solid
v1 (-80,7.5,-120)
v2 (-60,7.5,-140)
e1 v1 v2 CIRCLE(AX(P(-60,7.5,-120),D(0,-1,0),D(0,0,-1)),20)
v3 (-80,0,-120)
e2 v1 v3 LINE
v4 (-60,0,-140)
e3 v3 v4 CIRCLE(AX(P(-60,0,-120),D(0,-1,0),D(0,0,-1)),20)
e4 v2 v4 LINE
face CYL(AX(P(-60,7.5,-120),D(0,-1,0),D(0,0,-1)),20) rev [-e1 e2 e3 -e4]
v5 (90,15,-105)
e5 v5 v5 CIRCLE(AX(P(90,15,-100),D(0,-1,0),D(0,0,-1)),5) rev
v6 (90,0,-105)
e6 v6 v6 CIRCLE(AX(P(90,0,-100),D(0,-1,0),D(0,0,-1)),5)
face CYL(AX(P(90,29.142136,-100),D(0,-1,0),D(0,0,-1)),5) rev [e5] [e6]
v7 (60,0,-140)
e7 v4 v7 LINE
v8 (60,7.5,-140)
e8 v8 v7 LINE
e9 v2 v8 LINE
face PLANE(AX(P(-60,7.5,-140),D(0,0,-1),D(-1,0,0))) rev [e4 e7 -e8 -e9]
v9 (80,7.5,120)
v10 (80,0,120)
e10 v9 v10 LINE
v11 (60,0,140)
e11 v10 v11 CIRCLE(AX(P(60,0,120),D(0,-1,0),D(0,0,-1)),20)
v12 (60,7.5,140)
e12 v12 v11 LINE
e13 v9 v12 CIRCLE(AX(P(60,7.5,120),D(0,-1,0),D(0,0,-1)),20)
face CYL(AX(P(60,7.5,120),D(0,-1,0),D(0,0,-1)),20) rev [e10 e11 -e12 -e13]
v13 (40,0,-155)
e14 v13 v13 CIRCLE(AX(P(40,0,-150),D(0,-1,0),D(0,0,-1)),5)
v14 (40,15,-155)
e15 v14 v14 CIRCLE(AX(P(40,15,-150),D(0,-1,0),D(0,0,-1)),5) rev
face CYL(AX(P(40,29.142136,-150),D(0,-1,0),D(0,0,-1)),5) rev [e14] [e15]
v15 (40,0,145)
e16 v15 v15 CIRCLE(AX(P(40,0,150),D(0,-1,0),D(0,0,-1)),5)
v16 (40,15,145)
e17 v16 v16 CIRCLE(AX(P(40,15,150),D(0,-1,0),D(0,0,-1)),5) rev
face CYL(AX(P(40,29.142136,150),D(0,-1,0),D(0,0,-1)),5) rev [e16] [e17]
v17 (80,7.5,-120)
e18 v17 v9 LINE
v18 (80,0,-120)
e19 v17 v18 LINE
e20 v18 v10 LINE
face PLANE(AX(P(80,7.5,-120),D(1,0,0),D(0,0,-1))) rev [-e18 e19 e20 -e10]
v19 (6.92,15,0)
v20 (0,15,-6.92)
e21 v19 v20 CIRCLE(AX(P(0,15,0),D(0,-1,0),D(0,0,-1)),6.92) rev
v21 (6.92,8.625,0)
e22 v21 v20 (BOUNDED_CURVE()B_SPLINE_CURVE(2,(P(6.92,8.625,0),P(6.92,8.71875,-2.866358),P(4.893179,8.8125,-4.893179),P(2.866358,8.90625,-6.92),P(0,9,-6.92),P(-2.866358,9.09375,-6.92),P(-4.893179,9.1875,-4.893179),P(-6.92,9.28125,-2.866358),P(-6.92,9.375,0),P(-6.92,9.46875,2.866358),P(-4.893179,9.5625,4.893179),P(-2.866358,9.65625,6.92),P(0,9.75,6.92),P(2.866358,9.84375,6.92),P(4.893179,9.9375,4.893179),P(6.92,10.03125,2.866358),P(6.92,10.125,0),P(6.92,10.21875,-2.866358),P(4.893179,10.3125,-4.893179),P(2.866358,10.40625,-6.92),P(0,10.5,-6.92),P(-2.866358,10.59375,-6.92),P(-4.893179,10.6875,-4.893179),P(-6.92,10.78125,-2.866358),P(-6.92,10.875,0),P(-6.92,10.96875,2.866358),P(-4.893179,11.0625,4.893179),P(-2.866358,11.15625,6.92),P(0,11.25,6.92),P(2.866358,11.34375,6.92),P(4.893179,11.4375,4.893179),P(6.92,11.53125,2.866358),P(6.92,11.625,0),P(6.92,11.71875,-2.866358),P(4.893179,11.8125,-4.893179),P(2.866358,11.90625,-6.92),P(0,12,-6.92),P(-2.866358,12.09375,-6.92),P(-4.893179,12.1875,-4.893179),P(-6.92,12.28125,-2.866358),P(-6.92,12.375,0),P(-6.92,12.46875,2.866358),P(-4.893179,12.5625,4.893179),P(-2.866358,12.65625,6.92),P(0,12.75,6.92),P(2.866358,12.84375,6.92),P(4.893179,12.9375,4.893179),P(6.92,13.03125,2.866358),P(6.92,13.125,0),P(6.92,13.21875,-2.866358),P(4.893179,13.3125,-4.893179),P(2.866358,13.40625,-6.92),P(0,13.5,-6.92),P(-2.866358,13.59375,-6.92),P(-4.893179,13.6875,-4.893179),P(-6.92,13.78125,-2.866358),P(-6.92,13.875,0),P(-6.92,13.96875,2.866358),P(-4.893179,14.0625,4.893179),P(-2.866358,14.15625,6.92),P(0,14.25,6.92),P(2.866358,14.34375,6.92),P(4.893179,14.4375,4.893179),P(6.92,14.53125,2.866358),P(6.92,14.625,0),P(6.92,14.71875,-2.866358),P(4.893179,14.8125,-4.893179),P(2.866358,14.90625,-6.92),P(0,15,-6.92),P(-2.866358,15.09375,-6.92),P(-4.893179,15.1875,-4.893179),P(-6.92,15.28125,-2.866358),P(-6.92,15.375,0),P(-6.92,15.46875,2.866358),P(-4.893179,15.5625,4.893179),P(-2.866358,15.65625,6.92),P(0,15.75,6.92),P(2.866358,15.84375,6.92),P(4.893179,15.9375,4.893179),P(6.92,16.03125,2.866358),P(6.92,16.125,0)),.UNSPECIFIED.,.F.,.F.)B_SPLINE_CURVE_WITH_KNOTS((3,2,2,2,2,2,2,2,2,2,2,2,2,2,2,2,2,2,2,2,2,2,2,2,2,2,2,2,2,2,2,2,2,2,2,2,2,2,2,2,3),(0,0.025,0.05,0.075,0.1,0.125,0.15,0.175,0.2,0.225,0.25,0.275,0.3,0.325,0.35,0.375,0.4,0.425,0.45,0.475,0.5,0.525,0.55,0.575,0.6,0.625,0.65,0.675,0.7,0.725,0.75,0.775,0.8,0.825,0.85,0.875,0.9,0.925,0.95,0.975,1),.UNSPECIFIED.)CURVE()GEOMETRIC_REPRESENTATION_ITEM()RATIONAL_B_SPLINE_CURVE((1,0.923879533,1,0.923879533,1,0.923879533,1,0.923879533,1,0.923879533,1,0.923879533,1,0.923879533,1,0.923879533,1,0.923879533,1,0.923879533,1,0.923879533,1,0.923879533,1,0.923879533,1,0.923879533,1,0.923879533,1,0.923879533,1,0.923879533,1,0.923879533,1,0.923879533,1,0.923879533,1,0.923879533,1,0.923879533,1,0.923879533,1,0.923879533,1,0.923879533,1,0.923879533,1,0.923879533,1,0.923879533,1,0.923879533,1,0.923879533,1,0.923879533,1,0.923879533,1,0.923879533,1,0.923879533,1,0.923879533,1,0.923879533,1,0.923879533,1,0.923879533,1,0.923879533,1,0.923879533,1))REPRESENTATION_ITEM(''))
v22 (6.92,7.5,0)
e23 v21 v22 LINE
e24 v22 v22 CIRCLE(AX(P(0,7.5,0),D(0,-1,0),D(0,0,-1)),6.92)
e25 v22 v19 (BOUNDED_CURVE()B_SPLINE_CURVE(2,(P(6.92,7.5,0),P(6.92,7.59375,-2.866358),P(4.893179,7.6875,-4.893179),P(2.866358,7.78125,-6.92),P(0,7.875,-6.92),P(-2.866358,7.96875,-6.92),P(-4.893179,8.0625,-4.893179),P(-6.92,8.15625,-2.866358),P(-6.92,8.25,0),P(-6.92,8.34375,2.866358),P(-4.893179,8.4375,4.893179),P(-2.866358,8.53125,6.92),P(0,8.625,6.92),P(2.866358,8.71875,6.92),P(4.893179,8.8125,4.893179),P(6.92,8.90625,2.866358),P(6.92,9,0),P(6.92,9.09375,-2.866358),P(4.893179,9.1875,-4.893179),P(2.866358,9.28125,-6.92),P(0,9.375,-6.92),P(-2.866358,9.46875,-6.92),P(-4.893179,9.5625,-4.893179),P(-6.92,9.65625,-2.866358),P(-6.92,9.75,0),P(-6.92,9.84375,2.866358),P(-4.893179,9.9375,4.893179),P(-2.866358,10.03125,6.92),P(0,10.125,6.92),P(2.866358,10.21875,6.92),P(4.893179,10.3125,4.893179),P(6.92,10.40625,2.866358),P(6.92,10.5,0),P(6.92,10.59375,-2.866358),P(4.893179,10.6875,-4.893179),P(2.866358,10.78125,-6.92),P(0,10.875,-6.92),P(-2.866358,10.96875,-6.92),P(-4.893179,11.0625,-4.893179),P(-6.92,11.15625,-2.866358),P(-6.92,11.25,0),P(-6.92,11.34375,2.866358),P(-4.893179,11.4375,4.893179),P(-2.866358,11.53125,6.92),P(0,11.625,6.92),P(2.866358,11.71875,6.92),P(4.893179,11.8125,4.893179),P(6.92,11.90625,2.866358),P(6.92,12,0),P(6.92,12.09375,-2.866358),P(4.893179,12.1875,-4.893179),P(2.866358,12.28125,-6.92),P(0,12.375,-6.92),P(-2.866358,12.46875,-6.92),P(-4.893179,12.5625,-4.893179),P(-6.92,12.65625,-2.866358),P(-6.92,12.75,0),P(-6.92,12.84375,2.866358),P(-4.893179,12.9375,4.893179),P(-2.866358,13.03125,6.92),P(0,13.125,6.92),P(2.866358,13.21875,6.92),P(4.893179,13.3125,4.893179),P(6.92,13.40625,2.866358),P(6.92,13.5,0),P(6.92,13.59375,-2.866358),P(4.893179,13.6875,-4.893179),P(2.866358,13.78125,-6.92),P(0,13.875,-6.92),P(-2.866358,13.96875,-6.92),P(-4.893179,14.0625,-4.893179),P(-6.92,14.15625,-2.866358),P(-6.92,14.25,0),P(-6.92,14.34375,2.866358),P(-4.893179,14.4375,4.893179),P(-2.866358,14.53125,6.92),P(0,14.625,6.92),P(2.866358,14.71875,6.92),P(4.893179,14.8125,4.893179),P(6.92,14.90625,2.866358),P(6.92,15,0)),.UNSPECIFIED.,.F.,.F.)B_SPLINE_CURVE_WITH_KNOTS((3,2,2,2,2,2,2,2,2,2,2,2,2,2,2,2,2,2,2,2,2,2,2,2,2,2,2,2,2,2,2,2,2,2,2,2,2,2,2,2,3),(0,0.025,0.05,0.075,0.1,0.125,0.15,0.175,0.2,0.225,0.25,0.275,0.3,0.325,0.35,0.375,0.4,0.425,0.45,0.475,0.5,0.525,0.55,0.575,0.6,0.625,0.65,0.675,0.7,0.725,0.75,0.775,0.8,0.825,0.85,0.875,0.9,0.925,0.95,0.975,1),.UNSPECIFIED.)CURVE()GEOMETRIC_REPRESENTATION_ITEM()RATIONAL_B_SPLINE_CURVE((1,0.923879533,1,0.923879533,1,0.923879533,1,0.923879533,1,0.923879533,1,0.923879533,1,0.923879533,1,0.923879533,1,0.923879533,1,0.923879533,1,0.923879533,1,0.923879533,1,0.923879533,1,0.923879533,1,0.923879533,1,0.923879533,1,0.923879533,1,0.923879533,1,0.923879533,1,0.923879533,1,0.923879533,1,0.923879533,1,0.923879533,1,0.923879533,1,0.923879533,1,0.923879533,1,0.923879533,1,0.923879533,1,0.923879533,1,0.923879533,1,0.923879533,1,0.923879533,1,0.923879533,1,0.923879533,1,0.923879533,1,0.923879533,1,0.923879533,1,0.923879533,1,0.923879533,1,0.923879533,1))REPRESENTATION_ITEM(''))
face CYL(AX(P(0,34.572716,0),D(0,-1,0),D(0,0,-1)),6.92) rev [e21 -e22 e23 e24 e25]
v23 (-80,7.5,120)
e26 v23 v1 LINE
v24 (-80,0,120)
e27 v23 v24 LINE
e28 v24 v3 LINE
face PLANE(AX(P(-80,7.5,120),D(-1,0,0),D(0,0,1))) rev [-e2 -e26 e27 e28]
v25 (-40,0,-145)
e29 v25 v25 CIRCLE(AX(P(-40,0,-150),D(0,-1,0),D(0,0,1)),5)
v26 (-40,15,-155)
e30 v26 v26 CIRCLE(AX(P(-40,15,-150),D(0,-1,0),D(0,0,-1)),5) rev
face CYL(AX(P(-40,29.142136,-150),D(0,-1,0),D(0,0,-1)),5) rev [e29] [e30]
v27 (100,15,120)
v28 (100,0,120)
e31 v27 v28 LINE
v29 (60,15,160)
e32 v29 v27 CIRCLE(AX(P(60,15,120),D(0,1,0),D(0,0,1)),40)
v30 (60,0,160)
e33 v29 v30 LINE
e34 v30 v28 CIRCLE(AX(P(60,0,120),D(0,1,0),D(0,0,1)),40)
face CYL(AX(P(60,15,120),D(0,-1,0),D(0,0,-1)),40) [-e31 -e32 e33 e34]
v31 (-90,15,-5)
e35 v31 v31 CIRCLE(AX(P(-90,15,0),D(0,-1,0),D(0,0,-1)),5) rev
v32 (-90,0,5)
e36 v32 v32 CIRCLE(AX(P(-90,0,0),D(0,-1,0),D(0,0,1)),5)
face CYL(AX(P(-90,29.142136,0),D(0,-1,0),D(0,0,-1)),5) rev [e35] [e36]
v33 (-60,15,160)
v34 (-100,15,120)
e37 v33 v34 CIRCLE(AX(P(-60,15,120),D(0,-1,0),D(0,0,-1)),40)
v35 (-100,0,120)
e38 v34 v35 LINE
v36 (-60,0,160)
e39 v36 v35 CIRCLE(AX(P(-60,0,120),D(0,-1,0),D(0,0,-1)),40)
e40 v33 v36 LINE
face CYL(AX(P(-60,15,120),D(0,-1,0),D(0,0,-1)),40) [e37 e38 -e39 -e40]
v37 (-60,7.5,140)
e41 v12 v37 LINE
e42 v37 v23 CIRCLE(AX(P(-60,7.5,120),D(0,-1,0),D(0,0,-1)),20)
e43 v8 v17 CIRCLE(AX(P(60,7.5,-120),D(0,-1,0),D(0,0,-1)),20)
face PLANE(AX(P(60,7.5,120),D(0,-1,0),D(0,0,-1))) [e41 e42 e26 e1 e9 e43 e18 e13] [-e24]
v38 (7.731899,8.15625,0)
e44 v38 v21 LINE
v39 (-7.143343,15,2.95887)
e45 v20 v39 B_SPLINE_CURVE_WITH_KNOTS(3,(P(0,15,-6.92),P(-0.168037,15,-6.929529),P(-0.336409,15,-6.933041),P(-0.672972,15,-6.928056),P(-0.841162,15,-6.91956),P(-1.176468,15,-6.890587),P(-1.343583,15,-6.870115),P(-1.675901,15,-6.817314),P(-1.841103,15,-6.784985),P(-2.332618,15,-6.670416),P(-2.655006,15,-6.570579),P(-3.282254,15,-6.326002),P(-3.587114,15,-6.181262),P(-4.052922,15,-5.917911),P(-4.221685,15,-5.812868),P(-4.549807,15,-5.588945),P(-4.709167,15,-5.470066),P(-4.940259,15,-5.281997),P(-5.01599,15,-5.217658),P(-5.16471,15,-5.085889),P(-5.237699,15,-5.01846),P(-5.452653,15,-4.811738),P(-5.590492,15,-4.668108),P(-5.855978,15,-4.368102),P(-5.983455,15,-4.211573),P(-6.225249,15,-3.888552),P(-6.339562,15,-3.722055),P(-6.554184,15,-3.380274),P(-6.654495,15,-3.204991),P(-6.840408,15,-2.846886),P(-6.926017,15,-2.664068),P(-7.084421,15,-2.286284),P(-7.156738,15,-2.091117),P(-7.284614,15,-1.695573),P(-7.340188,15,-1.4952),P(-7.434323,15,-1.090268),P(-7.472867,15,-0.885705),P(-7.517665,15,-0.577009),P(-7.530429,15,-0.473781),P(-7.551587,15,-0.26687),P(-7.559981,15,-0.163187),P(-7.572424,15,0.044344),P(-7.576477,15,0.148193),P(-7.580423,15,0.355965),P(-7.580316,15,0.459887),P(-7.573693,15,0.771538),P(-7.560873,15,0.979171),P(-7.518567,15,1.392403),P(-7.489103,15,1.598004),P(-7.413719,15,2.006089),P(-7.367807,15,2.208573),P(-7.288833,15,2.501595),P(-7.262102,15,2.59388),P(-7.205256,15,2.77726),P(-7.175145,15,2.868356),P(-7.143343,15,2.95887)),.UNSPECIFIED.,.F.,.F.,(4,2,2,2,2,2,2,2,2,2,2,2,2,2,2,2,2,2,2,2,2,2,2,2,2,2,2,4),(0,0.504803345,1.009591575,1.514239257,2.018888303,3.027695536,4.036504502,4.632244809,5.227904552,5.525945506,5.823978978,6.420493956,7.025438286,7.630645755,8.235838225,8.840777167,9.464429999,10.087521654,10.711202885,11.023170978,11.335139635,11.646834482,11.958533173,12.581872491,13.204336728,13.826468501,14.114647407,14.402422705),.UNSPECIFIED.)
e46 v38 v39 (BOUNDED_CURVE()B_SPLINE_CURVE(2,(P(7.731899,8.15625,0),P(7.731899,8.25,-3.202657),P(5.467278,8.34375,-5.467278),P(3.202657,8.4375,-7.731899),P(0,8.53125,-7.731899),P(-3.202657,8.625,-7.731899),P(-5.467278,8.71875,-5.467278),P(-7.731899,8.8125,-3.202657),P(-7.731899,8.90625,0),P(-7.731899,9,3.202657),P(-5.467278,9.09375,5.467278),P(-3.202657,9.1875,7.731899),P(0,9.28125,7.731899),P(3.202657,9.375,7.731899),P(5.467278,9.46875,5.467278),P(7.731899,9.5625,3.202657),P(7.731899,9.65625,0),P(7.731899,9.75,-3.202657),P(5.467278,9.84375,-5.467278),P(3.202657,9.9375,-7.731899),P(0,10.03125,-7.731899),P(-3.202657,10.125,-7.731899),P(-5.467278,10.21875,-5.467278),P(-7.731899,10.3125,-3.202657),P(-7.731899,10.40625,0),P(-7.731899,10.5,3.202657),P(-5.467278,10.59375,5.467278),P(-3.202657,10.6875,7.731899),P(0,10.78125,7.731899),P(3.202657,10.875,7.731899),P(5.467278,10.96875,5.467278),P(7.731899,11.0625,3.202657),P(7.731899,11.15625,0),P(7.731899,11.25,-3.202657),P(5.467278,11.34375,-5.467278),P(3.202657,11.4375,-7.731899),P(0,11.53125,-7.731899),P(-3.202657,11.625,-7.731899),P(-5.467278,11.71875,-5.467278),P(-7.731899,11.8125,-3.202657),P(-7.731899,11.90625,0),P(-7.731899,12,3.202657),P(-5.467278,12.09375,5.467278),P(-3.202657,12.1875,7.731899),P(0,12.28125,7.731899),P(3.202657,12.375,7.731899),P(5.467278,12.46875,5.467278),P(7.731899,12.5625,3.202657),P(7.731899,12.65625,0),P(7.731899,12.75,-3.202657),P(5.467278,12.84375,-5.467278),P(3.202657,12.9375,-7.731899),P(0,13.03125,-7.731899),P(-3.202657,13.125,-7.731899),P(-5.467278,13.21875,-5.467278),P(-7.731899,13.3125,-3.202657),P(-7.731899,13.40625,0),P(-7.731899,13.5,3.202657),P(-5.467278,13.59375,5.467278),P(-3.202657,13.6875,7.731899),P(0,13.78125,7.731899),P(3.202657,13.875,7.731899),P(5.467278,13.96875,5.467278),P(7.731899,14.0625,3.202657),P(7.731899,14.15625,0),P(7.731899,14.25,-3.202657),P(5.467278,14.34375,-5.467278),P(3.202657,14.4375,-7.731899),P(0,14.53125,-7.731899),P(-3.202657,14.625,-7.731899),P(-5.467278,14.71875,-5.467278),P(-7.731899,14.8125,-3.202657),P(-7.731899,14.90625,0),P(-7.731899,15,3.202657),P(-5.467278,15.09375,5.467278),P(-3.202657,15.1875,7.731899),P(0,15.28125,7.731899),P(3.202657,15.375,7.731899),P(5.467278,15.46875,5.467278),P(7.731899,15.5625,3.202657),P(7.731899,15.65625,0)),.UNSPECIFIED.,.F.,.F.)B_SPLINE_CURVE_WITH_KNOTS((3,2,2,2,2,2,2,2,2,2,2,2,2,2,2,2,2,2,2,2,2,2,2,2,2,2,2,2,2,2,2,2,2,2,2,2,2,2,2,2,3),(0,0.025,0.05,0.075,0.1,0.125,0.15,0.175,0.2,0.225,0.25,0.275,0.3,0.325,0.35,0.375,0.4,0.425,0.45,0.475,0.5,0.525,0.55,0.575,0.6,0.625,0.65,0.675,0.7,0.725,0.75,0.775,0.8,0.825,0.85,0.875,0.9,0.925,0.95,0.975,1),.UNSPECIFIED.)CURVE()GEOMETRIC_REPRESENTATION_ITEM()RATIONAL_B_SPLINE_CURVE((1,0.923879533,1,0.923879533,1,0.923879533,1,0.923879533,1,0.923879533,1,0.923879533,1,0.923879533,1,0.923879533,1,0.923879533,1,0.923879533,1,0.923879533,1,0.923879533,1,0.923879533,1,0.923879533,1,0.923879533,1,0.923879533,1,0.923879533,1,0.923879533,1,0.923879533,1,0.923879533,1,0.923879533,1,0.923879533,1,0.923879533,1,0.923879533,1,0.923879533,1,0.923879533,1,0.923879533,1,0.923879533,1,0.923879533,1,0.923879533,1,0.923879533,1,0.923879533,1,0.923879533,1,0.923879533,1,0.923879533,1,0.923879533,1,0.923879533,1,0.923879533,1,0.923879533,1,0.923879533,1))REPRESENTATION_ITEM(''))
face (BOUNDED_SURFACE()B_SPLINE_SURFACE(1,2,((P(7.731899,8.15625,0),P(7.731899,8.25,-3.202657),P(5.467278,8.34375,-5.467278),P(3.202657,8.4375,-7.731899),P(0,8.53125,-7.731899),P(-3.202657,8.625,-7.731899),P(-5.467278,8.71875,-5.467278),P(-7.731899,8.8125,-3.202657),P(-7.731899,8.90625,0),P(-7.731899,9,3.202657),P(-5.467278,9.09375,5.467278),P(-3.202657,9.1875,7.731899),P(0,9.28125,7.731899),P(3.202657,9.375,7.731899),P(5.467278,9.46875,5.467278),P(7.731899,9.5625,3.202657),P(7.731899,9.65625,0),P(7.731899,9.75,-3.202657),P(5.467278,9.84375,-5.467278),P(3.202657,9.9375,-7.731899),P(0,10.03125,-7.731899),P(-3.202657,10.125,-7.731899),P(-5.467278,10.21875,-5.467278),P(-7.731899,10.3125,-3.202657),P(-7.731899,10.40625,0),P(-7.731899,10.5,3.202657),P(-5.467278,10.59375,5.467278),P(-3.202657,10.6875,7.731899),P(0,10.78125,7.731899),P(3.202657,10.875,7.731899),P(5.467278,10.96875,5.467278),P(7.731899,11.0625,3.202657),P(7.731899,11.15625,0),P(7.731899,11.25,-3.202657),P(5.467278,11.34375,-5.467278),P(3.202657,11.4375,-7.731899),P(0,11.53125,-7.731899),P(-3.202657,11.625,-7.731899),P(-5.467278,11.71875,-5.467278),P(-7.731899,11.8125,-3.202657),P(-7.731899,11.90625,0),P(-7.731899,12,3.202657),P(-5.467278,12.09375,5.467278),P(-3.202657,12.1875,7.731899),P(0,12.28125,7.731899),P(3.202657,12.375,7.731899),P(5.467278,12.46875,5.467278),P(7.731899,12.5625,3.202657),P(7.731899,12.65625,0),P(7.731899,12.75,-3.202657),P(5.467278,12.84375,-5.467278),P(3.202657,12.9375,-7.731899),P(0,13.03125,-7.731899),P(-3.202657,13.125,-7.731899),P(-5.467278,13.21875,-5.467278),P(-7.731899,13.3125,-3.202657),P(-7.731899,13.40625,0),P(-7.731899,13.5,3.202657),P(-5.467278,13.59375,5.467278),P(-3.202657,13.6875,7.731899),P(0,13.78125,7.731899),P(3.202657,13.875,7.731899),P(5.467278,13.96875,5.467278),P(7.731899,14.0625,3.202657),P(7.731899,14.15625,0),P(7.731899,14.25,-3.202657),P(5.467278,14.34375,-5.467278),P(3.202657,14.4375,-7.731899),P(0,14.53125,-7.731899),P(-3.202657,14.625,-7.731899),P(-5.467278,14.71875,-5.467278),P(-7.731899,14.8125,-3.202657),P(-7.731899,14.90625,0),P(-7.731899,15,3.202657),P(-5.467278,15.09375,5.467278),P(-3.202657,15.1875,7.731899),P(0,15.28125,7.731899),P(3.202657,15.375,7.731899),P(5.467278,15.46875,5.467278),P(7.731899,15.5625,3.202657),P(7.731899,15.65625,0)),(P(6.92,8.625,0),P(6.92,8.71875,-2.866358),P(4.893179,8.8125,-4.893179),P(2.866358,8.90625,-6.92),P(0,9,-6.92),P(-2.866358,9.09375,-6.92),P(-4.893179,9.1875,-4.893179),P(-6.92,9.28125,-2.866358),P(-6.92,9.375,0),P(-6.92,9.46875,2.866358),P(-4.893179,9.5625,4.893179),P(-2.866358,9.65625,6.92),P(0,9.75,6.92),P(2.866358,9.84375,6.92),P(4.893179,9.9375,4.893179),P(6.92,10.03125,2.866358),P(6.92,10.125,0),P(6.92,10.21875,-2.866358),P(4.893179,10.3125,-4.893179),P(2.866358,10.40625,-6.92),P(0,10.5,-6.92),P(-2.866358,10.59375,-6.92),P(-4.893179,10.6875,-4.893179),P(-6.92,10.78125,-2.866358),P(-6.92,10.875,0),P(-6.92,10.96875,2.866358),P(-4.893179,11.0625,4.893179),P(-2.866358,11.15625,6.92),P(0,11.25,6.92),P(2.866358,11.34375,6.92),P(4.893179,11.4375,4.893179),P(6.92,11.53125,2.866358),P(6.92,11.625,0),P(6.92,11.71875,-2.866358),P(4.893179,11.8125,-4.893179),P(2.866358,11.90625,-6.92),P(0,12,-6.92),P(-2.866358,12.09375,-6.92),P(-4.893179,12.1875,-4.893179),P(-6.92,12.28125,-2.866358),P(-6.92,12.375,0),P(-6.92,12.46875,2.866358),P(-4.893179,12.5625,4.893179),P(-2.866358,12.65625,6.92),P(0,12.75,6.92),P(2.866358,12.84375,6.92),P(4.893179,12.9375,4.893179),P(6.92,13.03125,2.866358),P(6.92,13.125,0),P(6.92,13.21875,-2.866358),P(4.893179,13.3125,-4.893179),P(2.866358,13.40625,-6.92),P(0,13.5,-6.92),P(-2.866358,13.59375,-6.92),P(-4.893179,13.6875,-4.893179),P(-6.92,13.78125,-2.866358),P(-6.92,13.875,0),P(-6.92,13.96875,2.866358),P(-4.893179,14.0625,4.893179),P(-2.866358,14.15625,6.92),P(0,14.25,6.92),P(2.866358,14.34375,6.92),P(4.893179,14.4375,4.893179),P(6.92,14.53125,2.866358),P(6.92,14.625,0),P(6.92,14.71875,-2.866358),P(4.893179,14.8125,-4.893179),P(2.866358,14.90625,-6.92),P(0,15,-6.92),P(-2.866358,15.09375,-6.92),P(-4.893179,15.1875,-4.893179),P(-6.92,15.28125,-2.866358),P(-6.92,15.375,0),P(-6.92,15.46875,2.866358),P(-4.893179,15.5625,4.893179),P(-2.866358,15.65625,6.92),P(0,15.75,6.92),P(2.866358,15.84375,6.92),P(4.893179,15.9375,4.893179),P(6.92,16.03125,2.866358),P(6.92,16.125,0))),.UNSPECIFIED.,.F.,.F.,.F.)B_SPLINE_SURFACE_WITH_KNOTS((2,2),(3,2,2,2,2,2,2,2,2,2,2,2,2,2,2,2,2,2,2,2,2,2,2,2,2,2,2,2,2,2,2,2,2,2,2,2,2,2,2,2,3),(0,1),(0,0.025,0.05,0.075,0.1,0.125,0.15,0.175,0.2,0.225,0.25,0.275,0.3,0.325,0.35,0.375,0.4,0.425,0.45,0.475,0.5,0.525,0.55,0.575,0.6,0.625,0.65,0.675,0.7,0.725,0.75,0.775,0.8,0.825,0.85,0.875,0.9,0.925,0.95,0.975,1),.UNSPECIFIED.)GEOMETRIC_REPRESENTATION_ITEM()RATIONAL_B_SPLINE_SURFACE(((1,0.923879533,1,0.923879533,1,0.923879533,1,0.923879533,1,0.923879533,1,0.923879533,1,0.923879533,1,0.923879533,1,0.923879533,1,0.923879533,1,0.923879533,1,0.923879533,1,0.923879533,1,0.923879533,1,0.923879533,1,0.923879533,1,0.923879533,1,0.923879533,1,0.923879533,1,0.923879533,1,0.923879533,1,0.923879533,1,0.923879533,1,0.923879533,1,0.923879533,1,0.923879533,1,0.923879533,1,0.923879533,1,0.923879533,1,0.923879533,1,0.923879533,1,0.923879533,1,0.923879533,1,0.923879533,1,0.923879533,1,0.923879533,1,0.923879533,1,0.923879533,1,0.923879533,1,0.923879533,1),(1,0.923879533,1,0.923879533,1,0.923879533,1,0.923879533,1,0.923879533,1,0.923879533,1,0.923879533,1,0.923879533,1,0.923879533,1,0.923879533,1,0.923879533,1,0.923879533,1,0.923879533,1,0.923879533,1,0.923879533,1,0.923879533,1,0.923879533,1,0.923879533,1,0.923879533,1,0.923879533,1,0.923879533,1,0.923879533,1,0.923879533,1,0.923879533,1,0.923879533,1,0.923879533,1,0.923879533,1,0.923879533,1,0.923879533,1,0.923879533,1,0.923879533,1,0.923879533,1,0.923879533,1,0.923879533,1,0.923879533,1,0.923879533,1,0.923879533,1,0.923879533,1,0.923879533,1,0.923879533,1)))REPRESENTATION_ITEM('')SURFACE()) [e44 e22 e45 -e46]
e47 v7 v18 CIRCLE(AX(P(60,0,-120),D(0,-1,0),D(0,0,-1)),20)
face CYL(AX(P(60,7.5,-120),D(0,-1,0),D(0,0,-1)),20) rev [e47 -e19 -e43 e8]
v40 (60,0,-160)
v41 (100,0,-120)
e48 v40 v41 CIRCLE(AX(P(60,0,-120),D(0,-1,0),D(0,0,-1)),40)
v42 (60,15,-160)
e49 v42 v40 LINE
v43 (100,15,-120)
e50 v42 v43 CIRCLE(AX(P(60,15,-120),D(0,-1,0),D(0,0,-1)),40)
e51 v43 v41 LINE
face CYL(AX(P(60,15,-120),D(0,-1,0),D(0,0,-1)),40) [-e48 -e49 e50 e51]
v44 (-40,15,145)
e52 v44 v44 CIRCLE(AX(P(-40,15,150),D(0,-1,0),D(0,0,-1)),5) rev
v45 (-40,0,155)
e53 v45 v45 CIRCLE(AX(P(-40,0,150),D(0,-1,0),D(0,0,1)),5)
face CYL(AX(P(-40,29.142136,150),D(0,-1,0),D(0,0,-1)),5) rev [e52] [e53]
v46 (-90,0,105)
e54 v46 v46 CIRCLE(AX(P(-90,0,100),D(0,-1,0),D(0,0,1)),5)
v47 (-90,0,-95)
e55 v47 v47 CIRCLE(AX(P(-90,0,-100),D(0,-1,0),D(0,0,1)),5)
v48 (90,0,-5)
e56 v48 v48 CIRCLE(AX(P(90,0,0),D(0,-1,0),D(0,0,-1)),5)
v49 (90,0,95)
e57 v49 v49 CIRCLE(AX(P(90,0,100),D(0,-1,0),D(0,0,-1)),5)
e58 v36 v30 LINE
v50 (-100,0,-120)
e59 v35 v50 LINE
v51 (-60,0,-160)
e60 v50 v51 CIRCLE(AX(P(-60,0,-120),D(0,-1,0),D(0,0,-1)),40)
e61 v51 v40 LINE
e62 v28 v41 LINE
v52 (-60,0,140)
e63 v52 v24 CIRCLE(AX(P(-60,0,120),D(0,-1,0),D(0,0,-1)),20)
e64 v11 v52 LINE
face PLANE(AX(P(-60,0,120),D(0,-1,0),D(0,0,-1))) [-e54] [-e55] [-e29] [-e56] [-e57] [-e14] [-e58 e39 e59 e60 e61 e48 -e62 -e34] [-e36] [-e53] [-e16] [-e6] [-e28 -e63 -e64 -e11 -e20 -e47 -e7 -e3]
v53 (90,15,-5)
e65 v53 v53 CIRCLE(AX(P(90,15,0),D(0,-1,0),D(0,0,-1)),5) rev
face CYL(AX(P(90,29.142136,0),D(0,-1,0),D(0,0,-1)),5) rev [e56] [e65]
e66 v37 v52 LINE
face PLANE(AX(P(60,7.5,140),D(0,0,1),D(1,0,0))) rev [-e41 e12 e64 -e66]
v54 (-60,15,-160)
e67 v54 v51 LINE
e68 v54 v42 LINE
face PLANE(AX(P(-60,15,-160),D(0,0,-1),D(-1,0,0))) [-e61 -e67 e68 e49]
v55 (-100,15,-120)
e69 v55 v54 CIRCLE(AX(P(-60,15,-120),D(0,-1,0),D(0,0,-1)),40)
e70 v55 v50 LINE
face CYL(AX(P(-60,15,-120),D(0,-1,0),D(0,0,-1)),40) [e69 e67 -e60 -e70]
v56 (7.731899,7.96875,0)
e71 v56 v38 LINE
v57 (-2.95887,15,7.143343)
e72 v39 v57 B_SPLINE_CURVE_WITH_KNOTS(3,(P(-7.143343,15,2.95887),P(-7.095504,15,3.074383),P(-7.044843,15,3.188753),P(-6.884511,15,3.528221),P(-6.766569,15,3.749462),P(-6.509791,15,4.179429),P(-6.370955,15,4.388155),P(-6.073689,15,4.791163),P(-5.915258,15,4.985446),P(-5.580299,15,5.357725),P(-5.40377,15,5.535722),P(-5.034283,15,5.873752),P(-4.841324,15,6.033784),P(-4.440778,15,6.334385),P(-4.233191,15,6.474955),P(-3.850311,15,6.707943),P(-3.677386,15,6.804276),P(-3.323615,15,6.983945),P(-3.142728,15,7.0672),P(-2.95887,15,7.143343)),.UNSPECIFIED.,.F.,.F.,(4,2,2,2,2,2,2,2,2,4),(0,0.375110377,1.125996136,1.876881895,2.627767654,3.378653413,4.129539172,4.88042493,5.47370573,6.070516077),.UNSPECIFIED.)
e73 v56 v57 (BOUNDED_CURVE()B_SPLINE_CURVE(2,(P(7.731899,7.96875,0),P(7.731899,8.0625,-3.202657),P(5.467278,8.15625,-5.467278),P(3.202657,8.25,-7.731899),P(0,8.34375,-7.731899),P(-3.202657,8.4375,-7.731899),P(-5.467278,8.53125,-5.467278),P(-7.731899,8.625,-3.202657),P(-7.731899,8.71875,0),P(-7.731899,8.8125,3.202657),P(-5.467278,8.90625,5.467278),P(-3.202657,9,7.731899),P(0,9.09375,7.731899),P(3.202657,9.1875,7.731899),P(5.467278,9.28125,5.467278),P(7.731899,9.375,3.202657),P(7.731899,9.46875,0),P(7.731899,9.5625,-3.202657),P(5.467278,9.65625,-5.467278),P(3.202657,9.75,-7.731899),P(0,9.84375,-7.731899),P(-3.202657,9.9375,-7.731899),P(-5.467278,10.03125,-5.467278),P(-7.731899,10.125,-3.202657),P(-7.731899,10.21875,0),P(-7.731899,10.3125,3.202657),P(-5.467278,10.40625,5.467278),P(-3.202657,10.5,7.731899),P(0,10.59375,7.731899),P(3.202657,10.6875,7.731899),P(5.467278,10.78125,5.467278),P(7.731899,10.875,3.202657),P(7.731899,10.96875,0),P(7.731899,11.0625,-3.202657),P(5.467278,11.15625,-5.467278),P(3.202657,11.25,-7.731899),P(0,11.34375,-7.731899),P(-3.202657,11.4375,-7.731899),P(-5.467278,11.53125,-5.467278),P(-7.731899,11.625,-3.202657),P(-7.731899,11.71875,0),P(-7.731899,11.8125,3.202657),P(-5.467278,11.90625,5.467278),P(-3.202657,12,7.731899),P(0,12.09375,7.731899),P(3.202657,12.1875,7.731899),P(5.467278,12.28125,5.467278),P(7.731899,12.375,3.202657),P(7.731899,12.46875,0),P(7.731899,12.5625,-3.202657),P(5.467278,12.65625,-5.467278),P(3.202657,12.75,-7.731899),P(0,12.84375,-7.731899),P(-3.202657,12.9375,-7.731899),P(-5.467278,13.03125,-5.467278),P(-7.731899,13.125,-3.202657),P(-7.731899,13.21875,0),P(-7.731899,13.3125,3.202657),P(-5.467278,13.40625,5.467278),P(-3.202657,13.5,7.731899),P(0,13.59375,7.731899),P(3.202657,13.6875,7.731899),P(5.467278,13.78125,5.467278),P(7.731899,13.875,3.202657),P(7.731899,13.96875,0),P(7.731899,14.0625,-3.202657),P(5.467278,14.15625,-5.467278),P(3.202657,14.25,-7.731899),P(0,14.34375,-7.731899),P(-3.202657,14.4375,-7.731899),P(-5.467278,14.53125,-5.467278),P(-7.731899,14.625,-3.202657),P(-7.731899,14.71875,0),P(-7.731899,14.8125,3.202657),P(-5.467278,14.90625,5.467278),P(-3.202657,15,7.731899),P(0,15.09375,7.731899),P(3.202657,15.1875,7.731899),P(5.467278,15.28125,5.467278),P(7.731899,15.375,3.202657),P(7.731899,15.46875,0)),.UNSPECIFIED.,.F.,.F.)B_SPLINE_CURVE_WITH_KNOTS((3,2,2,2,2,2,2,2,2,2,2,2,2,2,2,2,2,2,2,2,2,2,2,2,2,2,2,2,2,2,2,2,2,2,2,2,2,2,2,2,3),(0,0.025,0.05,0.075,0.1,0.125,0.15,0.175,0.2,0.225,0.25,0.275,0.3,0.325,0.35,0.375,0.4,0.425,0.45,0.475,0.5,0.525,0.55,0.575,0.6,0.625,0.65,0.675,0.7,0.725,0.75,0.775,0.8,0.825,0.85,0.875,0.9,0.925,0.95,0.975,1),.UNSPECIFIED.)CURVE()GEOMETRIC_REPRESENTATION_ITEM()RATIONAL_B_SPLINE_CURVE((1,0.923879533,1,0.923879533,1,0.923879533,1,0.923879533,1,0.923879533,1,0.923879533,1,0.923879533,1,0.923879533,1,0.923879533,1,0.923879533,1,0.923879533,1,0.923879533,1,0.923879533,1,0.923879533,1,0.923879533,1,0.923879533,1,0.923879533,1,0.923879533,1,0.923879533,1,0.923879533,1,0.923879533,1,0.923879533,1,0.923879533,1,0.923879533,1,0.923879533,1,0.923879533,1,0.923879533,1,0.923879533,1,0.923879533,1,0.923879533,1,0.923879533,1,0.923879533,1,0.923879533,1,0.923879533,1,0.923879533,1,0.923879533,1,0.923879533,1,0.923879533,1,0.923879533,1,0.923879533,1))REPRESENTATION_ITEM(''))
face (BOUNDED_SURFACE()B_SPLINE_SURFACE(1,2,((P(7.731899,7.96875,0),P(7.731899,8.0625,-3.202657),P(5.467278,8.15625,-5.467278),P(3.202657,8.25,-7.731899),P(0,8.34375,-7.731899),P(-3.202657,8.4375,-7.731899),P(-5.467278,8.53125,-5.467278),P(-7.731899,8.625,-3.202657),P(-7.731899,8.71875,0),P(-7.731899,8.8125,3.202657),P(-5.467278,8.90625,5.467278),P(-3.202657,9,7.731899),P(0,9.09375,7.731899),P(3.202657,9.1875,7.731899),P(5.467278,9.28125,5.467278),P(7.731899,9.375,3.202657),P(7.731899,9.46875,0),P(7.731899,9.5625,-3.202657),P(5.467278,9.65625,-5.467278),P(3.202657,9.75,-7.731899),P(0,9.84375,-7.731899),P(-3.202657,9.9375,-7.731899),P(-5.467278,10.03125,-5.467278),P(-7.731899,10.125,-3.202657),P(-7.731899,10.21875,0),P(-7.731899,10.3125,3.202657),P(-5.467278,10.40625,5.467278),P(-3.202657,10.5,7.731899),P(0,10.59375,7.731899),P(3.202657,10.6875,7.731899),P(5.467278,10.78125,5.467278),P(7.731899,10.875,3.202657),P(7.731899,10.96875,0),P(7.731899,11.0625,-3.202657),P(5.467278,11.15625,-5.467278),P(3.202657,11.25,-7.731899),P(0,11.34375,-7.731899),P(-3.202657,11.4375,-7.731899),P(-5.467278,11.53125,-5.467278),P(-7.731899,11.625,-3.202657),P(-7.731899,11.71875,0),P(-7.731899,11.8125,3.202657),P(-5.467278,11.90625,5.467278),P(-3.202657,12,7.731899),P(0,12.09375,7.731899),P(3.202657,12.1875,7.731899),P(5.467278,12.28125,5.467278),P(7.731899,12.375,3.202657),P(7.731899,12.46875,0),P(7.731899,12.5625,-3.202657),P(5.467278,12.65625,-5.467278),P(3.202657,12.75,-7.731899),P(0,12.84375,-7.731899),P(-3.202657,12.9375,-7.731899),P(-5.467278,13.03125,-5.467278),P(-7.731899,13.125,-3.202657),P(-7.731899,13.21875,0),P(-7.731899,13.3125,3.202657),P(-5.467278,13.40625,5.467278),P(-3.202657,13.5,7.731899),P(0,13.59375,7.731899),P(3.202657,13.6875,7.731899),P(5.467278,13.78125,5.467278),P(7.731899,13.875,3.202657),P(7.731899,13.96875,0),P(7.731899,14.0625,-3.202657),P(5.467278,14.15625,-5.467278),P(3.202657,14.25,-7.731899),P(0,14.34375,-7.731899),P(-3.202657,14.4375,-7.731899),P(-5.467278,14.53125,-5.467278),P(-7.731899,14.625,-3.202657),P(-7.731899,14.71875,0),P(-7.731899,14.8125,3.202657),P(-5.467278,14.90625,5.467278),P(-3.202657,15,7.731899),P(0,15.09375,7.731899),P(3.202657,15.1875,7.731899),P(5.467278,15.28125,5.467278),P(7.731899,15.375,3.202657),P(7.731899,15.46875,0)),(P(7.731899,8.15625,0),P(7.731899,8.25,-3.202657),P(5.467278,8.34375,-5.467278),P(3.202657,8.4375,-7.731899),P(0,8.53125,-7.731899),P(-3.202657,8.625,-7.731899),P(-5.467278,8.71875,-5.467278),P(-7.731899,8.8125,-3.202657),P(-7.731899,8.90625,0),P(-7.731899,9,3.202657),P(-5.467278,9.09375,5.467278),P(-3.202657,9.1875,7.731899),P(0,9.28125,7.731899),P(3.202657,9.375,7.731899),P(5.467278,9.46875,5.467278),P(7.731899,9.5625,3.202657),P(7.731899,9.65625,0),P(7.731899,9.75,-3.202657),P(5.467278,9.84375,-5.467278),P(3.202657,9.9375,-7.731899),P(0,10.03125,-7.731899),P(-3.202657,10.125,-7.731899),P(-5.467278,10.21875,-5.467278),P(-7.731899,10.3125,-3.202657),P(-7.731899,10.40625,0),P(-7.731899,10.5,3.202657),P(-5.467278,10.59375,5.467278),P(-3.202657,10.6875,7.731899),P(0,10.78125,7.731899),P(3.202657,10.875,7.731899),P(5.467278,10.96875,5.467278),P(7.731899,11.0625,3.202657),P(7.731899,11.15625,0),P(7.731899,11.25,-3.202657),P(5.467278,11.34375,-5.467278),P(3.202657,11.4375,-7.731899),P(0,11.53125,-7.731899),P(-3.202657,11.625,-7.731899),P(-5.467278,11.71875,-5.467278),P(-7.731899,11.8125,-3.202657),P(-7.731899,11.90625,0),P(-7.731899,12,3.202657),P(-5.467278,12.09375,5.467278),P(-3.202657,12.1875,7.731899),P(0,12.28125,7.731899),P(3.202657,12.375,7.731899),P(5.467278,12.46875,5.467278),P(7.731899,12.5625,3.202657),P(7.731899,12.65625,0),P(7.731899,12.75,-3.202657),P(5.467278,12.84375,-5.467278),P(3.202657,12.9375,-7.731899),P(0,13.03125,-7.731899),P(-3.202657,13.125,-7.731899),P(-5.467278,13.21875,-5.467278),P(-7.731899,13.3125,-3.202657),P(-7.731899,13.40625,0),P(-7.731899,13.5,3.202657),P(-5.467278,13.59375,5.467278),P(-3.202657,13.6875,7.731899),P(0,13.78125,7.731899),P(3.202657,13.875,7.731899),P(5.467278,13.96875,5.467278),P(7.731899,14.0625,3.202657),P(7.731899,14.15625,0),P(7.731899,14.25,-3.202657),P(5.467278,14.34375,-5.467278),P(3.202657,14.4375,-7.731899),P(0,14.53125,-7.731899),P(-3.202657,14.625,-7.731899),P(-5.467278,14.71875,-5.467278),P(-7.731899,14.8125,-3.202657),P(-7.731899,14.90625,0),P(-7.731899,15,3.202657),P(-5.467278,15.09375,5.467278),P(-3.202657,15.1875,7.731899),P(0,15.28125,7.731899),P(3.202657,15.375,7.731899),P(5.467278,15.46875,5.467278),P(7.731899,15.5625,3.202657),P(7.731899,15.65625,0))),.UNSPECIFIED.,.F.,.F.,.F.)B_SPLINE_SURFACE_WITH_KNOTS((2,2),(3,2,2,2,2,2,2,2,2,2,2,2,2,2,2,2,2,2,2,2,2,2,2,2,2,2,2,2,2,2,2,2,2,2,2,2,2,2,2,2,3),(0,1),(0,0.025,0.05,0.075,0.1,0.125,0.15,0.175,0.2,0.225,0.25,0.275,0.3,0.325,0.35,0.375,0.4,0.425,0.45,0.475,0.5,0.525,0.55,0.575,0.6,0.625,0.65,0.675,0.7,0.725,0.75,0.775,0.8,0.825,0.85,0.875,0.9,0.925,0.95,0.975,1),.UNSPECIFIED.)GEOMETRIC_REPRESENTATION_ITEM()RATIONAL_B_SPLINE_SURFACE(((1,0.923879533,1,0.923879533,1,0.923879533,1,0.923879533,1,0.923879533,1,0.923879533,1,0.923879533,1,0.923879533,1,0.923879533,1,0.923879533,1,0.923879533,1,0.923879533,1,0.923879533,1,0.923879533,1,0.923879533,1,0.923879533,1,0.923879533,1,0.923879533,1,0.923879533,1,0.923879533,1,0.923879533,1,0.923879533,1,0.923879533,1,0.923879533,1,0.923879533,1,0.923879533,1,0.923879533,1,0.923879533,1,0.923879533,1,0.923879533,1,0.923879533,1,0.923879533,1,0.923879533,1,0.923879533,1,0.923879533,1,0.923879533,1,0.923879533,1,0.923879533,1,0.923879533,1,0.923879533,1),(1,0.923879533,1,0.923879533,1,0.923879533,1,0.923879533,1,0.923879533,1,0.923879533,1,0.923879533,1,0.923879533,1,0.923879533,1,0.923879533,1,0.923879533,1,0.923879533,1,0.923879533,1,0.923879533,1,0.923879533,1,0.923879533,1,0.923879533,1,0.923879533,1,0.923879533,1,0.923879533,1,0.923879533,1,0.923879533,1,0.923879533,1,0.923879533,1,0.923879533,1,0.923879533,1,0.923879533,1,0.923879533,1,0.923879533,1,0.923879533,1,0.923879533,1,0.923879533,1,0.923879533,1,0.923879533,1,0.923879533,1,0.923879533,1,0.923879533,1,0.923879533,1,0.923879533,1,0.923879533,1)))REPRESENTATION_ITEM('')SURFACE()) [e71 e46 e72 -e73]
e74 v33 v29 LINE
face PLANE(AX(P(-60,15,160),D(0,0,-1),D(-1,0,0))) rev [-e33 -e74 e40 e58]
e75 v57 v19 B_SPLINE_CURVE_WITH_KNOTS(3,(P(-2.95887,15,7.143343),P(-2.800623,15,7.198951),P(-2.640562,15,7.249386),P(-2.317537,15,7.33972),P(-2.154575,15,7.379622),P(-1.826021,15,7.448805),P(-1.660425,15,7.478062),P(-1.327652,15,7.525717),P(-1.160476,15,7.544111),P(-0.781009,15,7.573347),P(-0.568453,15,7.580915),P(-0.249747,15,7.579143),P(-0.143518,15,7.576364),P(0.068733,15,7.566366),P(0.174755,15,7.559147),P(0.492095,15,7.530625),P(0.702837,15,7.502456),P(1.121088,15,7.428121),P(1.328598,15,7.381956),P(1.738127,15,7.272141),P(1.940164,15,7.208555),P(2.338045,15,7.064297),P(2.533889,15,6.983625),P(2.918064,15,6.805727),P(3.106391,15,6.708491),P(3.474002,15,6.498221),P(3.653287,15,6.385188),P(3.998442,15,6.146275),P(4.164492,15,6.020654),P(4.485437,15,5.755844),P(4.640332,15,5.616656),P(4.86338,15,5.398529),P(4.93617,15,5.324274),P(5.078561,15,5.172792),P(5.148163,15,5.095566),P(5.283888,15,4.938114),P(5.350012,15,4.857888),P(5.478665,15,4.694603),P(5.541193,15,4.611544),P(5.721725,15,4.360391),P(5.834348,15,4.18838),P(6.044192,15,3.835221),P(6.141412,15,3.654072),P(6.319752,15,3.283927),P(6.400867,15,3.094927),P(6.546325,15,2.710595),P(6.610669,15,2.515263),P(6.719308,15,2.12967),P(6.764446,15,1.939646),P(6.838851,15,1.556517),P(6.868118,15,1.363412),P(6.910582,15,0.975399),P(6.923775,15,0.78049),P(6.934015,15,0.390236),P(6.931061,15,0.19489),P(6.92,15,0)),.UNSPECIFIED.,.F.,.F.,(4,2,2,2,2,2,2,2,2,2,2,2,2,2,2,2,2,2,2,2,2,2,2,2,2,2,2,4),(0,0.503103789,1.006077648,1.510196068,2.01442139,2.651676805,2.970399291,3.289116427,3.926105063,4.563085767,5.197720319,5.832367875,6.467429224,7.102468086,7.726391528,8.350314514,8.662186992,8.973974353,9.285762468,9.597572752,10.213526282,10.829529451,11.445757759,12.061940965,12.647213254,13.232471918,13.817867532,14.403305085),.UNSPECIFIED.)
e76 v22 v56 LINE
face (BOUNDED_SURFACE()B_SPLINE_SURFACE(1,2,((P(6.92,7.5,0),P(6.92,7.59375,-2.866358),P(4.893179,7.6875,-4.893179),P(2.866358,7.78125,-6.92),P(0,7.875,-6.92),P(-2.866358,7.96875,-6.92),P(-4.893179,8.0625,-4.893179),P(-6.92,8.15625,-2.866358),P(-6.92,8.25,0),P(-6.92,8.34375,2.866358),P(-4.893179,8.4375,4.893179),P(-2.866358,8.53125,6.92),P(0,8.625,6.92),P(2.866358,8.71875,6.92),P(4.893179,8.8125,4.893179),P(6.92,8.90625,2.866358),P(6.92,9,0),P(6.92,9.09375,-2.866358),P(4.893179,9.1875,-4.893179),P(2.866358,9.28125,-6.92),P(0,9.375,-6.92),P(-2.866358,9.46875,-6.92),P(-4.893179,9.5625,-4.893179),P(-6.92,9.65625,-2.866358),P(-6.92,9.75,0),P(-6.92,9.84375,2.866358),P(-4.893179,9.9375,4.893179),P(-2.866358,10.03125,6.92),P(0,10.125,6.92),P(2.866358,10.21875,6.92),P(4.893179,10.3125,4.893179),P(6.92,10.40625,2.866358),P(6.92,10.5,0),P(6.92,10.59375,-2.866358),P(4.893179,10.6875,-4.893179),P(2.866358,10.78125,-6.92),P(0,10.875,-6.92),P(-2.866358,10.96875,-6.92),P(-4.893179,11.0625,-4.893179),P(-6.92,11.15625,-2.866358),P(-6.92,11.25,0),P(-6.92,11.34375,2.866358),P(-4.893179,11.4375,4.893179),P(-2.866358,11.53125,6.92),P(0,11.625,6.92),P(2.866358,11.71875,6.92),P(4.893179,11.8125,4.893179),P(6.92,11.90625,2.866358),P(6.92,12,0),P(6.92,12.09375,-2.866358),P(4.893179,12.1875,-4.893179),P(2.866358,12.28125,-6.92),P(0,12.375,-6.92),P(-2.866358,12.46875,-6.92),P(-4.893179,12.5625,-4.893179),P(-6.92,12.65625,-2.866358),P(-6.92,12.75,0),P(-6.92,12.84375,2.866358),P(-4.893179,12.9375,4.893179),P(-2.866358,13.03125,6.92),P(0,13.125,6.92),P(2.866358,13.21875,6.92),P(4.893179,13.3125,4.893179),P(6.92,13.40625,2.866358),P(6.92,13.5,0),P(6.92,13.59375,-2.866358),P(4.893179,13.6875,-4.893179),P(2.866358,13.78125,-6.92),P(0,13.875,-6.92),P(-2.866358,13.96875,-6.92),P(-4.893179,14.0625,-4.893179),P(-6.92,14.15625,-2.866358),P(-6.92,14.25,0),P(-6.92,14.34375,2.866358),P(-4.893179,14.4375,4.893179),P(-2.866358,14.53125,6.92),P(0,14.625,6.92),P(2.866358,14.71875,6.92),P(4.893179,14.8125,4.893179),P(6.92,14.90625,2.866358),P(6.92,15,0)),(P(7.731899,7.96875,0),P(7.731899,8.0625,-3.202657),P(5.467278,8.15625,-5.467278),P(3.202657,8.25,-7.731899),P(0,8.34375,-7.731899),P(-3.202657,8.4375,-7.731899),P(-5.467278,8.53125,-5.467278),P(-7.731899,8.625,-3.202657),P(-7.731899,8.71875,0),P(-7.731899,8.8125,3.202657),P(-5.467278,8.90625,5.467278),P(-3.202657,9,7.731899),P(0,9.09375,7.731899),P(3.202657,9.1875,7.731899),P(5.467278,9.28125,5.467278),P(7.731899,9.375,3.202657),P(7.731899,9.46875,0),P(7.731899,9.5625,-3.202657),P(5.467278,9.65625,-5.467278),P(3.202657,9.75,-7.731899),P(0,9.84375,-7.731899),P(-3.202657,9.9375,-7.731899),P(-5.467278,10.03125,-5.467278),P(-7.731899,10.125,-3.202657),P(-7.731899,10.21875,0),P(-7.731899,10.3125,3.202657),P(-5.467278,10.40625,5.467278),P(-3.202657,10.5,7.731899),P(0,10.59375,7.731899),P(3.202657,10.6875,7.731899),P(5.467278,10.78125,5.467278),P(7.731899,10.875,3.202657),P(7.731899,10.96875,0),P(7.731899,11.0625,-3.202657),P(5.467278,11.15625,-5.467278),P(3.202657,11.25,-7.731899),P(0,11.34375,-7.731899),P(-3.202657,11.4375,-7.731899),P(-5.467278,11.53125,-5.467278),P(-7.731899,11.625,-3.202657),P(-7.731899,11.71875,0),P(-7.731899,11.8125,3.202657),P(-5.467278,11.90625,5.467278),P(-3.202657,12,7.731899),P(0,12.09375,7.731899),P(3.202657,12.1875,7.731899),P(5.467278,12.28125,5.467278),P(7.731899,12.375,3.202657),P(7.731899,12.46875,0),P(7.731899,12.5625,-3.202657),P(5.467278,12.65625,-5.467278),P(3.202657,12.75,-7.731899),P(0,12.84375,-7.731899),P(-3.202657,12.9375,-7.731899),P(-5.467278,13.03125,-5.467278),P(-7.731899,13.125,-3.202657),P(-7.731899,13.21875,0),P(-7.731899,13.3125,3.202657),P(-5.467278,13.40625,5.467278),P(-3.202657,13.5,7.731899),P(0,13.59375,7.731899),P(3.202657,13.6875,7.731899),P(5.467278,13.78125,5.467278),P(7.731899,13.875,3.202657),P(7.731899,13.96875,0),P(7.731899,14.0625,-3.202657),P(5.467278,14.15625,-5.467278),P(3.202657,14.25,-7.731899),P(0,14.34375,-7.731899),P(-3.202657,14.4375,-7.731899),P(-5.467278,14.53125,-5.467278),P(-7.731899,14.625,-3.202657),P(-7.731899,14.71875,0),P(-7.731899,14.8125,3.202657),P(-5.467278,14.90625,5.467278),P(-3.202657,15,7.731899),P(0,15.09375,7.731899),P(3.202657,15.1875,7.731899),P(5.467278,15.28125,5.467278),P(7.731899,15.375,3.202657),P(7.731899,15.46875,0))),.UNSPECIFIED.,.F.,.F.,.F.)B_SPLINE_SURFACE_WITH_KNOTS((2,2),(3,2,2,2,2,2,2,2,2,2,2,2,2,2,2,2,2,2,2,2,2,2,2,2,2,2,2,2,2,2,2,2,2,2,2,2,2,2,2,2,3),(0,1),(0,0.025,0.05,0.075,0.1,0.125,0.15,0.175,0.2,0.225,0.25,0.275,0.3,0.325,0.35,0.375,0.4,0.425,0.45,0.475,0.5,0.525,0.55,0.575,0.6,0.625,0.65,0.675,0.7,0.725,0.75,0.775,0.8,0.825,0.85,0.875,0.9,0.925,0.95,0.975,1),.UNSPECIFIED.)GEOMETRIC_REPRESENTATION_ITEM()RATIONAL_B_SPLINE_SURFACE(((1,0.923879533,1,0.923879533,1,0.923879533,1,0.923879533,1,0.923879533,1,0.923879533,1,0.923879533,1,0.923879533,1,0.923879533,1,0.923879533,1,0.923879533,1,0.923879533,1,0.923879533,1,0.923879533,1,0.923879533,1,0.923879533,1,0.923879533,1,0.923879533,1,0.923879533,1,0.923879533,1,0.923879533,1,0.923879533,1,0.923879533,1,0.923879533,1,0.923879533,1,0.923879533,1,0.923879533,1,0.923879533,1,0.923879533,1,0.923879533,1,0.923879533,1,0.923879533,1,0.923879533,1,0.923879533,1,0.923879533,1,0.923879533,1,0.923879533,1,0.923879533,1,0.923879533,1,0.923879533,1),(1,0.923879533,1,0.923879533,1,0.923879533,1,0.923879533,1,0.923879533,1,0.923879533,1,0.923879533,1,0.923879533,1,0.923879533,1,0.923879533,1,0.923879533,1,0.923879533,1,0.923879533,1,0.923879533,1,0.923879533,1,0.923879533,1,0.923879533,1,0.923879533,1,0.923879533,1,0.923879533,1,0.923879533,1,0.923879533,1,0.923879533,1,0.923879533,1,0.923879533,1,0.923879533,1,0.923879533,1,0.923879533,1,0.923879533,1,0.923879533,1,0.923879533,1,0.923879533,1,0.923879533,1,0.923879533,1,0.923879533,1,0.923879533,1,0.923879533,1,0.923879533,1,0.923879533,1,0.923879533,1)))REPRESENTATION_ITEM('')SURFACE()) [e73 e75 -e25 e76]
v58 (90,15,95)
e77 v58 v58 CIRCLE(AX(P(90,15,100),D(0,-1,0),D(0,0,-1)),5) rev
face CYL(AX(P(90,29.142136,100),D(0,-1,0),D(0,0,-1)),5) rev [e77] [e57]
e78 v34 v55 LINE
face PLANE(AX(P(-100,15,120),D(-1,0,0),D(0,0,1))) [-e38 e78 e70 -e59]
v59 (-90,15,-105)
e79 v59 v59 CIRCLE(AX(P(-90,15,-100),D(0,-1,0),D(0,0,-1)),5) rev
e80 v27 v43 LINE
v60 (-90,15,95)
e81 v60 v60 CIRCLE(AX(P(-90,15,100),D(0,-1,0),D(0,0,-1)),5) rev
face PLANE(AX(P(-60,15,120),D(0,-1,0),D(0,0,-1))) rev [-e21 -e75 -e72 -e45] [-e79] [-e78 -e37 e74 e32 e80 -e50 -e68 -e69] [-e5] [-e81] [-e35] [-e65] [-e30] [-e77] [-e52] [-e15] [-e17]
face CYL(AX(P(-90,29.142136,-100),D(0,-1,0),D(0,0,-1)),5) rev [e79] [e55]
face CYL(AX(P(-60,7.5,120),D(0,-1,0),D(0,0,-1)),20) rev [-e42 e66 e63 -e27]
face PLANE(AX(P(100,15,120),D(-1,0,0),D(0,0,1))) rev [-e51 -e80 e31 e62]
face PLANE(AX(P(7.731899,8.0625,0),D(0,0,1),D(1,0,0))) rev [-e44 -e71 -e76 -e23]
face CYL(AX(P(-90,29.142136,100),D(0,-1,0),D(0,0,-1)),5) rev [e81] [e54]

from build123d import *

# Parameters (mm, degrees)
BOSS_EXTRUDE1_DEPTH = 15
CUT_EXTRUDE1_DEPTH  = 7.5
SKETCH3_R           = 6.92
CUT_EXTRUDE2_DEPTH  = 7.5
SKETCH4_R           = 5
CUT_EXTRUDE3_DEPTH  = 15
THREAD1_PITCH       = 1.5


with BuildPart() as part:
    # Sketch1 → Boss-Extrude1 (new body)
    with BuildSketch(Plane(origin=(0, 0, 0), x_dir=(1, 0, 0), z_dir=(0, 1, 0))):
        with BuildLine():
            Line((-100, -120), (-100, 120))
            ThreePointArc((-100, 120), (-88.284271247, 148.284271247), (-60, 160))
            Line((-60, 160), (60, 160))
            ThreePointArc((60, 160), (88.284271247, 148.284271247), (100, 120))
            Line((100, 120), (100, -120))
            ThreePointArc((100, -120), (88.284271247, -148.284271247), (60, -160))
            Line((60, -160), (-60, -160))
            ThreePointArc((-60, -160), (-88.284271247, -148.284271247), (-100, -120))
        make_face()
    extrude(amount=BOSS_EXTRUDE1_DEPTH)

    # Sketch2 → Cut-Extrude1 (cut)
    with BuildSketch(Plane.XZ):
        with BuildLine():
            Line((80, -120), (80, 120))
            ThreePointArc((80, 120), (74.142135624, 134.142135624), (60, 140))
            Line((60, 140), (-60, 140))
            ThreePointArc((-60, 140), (-74.142135624, 134.142135624), (-80, 120))
            Line((-80, 120), (-80, -120))
            ThreePointArc((-80, -120), (-74.142135624, -134.142135624), (-60, -140))
            Line((-60, -140), (60, -140))
            ThreePointArc((60, -140), (74.142135624, -134.142135624), (80, -120))
        make_face()
    extrude(amount=-CUT_EXTRUDE1_DEPTH, mode=Mode.SUBTRACT)

    # Sketch3 → Cut-Extrude2 (cut)
    with BuildSketch(Plane.XZ.offset(-7.5)):
        with Locations(Location((0, 0, 0), (0, 0, 270))):
            Circle(SKETCH3_R)
    extrude(amount=-CUT_EXTRUDE2_DEPTH, mode=Mode.SUBTRACT)

    # Sketch4 → Cut-Extrude3 (cut)
    with BuildSketch(Plane.XZ):
        with Locations(Location((40, 150, 0), (0, 0, 270))):
            Circle(SKETCH4_R)
        with Locations(Location((90, 0, 0), (0, 0, 270))):
            Circle(SKETCH4_R)
        with Locations(Location((90, 100, 0), (0, 0, 270))):
            Circle(SKETCH4_R)
        with Locations(Location((90, -100, 0), (0, 0, 270))):
            Circle(SKETCH4_R)
        with Locations(Location((40, -150, 0), (0, 0, 270))):
            Circle(SKETCH4_R)
        with Locations(Location((-40, -150, 0), (0, 0, 270))):
            Circle(SKETCH4_R)
        with Locations(Location((-90, -100, 0), (0, 0, 270))):
            Circle(SKETCH4_R)
        with Locations(Location((-90, 100, 0), (0, 0, 270))):
            Circle(SKETCH4_R)
        with Locations(Location((-90, 0, 0), (0, 0, 270))):
            Circle(SKETCH4_R)
        with Locations(Location((-40, 150, 0), (0, 0, 270))):
            Circle(SKETCH4_R)
    extrude(amount=-CUT_EXTRUDE3_DEPTH, mode=Mode.SUBTRACT)

    # Thread1: the profile of Thread Profile1 profile screwed along a right-hand helix of 5 turns, 8 arcs to a turn; built about Z, then put on its axis
    thread1_z = Axis((0, 0, 0), (0, 0, 1))
    thread1_corners = [(6.9197, 0, -0.000173205), (7.731898812, 0, 0.468749998), (7.731898812, 0, 0.656249998), (6.9197, 0, 1.125173201)]
    with BuildLine(mode=Mode.PRIVATE) as thread1_profile:
        Line(thread1_corners[0], thread1_corners[1])
        Line(thread1_corners[1], thread1_corners[2])
        Line(thread1_corners[2], thread1_corners[3])
        Line(thread1_corners[3], thread1_corners[0])
    thread1_cap = Face(thread1_profile.wire())
    thread1_turn_angles = [0, 22.5, 45, 67.5, 90, 112.5, 135, 157.5, 180, 202.5, 225, 247.5, 270, 292.5, 315, 337.5, 360]
    thread1_turn_weights = [1, 0.9238795325112867, 1, 0.9238795325112867, 1, 0.9238795325112867, 1, 0.9238795325112867, 1, 0.9238795325112867, 1, 0.9238795325112867, 1, 0.9238795325112867, 1, 0.9238795325112867, 1]
    thread1_turn_rails = [Edge.make_bspline([Vector(p[0], p[1], 0).rotate(thread1_z, thread1_turn_angles[k]) / thread1_turn_weights[k] + Vector(0, 0, p[2] + THREAD1_PITCH * thread1_turn_angles[k] / 360) for k in range(17)], [0, 0, 0, 1, 1, 2, 2, 3, 3, 4, 4, 5, 5, 6, 6, 7, 7, 8, 8, 8], 2, thread1_turn_weights) for p in thread1_corners]
    thread1_turn_sides = [Face.make_surface_from_curves(thread1_turn_rails[p[0]], thread1_turn_rails[p[1]]) for p in [(0, 1), (1, 2), (2, 3), (3, 0)]]
    thread1 = Plane(origin=(0, 7.5, 0), x_dir=(1, 0, 0), z_dir=(0, 1, 0)) * Solid(Shell([*[p.moved(Location((0, 0, THREAD1_PITCH * i))) for i in range(5) for p in thread1_turn_sides], thread1_cap, thread1_cap.rotate(thread1_z, 1800).moved(Location((0, 0, THREAD1_PITCH * 1800 / 360)))]))
    add(thread1, mode=Mode.SUBTRACT)


solid = part.part
